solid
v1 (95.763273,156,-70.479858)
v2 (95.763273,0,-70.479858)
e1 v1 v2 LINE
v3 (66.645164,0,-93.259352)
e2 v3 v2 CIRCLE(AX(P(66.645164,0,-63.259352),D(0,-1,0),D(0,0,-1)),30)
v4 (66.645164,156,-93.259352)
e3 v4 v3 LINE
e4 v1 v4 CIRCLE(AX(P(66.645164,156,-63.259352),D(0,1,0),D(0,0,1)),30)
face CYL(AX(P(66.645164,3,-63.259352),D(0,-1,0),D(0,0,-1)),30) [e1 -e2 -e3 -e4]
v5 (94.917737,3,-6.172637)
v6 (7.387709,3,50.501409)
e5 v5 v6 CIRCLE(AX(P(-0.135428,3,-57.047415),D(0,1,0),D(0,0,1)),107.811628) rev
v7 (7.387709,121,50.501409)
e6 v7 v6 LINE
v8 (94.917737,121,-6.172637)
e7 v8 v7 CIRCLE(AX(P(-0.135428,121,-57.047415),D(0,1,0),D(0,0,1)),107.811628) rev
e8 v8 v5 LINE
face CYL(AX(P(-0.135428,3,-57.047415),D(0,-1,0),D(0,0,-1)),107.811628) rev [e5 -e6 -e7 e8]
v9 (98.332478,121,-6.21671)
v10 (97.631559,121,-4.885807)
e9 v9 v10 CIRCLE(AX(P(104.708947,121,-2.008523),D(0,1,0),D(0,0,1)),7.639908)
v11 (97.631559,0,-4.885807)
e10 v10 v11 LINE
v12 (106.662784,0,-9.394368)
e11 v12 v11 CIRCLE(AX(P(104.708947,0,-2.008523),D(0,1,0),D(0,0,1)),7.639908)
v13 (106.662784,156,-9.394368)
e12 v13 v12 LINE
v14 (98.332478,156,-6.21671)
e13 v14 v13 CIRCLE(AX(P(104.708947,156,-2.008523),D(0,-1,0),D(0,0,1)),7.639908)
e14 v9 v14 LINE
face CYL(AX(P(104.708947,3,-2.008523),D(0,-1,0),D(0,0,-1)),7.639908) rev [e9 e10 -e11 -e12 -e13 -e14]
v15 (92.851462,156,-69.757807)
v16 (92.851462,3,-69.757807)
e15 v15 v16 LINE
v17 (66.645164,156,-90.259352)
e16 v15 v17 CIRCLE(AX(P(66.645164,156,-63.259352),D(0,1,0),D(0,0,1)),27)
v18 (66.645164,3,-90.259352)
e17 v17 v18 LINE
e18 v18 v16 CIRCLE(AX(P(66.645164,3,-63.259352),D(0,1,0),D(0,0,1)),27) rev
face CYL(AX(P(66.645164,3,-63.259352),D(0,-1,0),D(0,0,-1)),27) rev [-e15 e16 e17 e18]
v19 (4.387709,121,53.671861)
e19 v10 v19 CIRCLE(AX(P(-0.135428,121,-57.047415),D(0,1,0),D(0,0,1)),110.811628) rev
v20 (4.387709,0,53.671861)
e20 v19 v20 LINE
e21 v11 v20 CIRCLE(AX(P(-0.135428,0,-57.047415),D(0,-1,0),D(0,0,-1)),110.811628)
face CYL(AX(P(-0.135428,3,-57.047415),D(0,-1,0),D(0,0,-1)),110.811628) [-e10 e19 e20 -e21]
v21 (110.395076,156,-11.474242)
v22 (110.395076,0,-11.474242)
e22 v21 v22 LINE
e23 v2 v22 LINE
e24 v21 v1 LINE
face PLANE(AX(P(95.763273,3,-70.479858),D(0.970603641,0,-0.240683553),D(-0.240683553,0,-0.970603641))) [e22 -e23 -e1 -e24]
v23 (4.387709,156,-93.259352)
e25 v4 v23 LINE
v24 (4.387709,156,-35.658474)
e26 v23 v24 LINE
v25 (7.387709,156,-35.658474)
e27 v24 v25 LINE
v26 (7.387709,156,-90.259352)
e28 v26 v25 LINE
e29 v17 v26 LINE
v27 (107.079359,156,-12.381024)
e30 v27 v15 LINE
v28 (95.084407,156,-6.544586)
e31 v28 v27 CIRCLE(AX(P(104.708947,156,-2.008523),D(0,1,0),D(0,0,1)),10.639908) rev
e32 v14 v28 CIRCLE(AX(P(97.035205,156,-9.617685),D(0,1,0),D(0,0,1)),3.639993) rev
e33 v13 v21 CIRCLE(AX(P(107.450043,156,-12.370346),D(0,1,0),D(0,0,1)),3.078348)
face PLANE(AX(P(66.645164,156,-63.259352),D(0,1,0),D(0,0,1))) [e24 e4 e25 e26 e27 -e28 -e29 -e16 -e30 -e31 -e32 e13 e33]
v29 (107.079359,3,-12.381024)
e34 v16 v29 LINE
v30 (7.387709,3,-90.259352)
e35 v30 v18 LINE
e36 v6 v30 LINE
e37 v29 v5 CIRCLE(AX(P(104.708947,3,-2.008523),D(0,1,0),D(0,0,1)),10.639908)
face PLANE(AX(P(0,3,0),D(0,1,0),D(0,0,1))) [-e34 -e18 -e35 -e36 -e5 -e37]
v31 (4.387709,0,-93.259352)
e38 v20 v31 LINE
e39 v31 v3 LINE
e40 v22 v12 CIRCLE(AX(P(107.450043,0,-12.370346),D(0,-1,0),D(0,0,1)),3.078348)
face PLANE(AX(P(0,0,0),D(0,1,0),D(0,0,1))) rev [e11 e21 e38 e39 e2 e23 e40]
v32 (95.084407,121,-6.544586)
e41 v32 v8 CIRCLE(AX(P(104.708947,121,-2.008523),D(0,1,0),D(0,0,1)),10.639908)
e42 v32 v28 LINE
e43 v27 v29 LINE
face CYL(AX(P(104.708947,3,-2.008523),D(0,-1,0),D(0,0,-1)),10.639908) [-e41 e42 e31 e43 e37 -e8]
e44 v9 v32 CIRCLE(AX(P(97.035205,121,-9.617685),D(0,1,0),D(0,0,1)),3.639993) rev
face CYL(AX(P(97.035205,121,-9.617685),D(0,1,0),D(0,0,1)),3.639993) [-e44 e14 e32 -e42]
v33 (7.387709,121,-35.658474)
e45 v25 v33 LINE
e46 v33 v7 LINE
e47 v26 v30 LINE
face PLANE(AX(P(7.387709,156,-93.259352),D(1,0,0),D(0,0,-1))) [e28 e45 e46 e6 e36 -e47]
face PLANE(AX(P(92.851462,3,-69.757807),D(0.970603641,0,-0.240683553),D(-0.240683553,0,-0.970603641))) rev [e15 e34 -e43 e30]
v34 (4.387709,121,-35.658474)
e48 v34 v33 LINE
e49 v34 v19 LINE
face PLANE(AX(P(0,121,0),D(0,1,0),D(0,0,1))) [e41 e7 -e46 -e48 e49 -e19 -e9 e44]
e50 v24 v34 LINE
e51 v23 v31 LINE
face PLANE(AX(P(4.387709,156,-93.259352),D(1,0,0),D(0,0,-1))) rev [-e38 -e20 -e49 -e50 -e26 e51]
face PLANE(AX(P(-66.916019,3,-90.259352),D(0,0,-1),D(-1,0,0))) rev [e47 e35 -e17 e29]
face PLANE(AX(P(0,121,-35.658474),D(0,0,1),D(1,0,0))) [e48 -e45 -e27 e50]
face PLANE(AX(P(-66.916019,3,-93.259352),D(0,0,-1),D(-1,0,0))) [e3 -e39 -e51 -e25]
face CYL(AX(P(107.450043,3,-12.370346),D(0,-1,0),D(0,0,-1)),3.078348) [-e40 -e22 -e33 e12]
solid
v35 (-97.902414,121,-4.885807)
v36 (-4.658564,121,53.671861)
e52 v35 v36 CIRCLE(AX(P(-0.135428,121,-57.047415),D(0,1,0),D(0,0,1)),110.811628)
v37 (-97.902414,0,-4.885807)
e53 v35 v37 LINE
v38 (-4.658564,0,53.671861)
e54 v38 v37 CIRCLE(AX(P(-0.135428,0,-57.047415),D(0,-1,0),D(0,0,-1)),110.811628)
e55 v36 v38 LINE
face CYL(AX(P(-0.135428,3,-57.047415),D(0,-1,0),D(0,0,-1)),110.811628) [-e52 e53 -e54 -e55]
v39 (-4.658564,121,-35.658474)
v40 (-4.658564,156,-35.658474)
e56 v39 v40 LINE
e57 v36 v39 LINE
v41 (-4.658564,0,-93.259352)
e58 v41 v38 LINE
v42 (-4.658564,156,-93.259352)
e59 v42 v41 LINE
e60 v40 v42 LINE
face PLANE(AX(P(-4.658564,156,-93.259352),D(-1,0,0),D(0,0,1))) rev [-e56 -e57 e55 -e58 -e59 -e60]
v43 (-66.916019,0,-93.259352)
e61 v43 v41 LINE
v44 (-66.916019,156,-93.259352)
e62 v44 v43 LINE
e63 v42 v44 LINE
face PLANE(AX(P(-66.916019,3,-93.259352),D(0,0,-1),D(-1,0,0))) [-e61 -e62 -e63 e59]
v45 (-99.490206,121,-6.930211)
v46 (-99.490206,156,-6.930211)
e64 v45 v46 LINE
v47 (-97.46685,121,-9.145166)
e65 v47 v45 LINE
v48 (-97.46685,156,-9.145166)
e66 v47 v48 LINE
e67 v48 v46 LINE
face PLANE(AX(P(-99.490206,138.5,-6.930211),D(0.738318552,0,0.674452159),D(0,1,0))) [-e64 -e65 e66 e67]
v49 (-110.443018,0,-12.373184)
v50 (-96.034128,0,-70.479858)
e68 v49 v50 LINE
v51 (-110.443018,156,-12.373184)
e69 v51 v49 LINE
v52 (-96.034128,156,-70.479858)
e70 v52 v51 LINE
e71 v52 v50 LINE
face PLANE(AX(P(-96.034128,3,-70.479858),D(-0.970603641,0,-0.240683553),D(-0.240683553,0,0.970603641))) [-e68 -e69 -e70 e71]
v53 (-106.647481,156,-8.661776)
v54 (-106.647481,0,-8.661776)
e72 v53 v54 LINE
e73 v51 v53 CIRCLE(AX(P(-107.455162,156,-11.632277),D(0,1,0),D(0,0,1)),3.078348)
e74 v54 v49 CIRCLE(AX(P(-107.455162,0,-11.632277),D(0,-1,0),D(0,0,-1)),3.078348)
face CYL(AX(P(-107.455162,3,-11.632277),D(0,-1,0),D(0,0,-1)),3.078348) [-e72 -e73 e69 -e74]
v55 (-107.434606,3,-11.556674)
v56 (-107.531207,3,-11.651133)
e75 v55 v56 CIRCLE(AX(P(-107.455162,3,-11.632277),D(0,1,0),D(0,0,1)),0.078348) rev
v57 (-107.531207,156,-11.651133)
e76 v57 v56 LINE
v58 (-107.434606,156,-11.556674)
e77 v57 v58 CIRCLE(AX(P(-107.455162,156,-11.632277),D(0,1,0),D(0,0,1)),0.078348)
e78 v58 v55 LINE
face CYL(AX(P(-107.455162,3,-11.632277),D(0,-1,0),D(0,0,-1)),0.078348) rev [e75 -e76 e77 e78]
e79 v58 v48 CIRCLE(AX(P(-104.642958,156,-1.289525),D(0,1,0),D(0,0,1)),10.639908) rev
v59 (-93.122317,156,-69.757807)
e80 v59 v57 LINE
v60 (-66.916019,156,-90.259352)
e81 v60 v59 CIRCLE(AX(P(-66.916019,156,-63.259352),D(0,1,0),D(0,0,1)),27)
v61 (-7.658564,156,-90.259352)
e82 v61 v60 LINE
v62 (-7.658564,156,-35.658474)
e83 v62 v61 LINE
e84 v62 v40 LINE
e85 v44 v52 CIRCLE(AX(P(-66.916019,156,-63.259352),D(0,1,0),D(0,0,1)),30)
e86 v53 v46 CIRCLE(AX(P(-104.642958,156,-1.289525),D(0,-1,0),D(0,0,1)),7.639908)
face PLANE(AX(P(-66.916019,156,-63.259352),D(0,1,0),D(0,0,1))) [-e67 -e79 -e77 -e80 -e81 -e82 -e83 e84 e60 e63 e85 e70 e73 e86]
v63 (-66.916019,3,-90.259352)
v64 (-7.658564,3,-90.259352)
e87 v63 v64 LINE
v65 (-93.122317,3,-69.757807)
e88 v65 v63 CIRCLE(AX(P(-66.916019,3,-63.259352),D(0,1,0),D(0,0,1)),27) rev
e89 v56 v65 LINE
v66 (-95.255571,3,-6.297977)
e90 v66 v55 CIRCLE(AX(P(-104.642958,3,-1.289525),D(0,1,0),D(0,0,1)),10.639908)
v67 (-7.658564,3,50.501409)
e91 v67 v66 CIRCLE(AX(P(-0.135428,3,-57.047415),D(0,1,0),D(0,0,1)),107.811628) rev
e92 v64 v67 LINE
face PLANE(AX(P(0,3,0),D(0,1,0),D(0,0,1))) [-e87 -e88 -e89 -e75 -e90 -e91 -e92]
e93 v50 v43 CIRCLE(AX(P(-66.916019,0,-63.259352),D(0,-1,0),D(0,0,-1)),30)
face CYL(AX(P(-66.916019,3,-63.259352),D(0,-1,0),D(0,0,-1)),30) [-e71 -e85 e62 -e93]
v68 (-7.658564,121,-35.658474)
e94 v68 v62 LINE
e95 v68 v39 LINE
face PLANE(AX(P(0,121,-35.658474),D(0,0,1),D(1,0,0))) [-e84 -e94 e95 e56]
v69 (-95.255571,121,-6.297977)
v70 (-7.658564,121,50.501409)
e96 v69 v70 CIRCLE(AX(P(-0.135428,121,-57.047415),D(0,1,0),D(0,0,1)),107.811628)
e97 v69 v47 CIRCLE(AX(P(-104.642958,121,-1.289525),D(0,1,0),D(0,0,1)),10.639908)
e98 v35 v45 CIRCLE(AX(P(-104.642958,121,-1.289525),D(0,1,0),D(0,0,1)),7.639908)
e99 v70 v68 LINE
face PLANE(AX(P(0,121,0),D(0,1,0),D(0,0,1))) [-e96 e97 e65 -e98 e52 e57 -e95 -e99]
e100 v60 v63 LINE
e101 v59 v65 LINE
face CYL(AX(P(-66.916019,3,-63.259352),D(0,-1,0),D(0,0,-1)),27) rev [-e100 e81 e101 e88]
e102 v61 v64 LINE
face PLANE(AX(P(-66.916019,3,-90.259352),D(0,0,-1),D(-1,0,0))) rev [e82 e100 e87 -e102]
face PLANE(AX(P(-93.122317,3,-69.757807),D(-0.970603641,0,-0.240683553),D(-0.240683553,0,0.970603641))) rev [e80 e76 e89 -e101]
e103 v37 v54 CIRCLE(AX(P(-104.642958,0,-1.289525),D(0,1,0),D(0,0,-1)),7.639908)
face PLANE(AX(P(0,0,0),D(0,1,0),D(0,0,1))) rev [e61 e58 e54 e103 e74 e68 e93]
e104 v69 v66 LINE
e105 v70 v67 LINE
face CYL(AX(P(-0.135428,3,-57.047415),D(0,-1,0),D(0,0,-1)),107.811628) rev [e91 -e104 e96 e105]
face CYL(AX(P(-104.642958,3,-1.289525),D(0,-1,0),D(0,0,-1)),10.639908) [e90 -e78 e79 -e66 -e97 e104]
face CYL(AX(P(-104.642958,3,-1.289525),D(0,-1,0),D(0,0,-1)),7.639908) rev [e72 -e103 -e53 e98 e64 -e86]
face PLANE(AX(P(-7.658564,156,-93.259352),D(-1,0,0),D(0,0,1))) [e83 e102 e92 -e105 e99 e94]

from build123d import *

# Parameters (mm, degrees)
SKETCH_1_W          = 300
SKETCH_1_H          = 250
EXTRUDE_1_DEPTH     = 3
SKETCH_2_W          = 300
SKETCH_2_H          = 250
CUT_EXTRUDE_1_DEPTH = 3
EXTRUDE_2_DEPTH     = 153
CUT_EXTRUDE_START   = -35
CUT_EXTRUDE_2_DEPTH = 35
CUT_EXTRUDE_START_2 = -10
CUT_EXTRUDE_3_DEPTH = 10
SHELL_START         = 3
SHELL_1_DEPTH       = 153
SHELL_START_2       = 121
SHELL_1_2_DEPTH     = 35
SHELL_2_T           = -3


# Read off the part's stored shape, not the designer's step: 抽壳1
with BuildPart() as part:
    # 草图1 → 凸台-拉伸1 (new body)
    with BuildSketch(Plane(origin=(0, 0, 0), x_dir=(1, 0, 0), z_dir=(0, 1, 0))):
        Rectangle(SKETCH_1_W, SKETCH_1_H)
    extrude(amount=EXTRUDE_1_DEPTH)

    # 草图2 → 切除-拉伸1 (cut)
    with BuildSketch(Plane.XZ):
        Rectangle(SKETCH_2_W, SKETCH_2_H)
        with BuildLine():
            Line((-96.034128138, -70.479858108), (-110.443017753, -12.373184121))
            ThreePointArc((-110.443017753, -12.373184121), (-109.607353553, -9.431300157), (-106.647480506, -8.661775979))
            ThreePointArc((-106.647480506, -8.661775979), (-101.61443354, -8.303527417), (-97.902413518, -4.885807248))
            ThreePointArc((-97.902413518, -4.885807248), (-0.135427504, 53.764212837), (97.631558511, -4.885807248))
            ThreePointArc((97.631558511, -4.885807248), (101.296546617, -8.843997431), (106.662783622, -9.394367981))
            ThreePointArc((106.662783622, -9.394367981), (108.948530847, -9.681339358), (110.395076199, -11.474241892))
            Line((110.395076199, -11.474241892), (95.763273131, -70.479858108))
            ThreePointArc((95.763273131, -70.479858108), (85.13008753, -86.887885102), (66.645163907, -93.259351533))
            Line((66.645163907, -93.259351533), (-66.916018914, -93.259351533))
            ThreePointArc((-66.916018914, -93.259351533), (-85.400942538, -86.887885102), (-96.034128138, -70.479858108))
        make_face(mode=Mode.SUBTRACT)
    extrude(amount=-CUT_EXTRUDE_1_DEPTH, mode=Mode.SUBTRACT)

    # 草图3 → 凸台-拉伸2 (add)
    with BuildSketch(Plane(origin=(0, 3, 0), x_dir=(1, 0, 0), z_dir=(0, 1, 0))):
        with BuildLine():
            Line((4.387708898, 93.259351533), (4.387708898, -53.671861104))
            ThreePointArc((4.387708898, -53.671861104), (58.797308872, -36.793671157), (97.631558511, 4.885807248))
            ThreePointArc((97.631558511, 4.885807248), (101.296546617, 8.843997431), (106.662783622, 9.394367981))
            ThreePointArc((106.662783622, 9.394367981), (108.948530847, 9.681339358), (110.395076199, 11.474241892))
            Line((110.395076199, 11.474241892), (95.763273131, 70.479858108))
            ThreePointArc((95.763273131, 70.479858108), (85.13008753, 86.887885102), (66.645163907, 93.259351533))
            Line((66.645163907, 93.259351533), (4.387708898, 93.259351533))
        make_face()
        with BuildLine():
            Line((-4.658563905, 93.259351533), (-4.658563905, -53.671861104))
            ThreePointArc((-4.658563905, -53.671861104), (-59.068163879, -36.793671157), (-97.902413518, 4.885807248))
            ThreePointArc((-97.902413518, 4.885807248), (-101.61443354, 8.303527417), (-106.647480506, 8.661775979))
            ThreePointArc((-106.647480506, 8.661775979), (-109.607353553, 9.431300157), (-110.443017753, 12.373184121))
            Line((-110.443017753, 12.373184121), (-96.034128138, 70.479858108))
            ThreePointArc((-96.034128138, 70.479858108), (-85.400942538, 86.887885102), (-66.916018914, 93.259351533))
            Line((-66.916018914, 93.259351533), (-4.658563905, 93.259351533))
        make_face()
    extrude(amount=EXTRUDE_2_DEPTH)

    # 草图4 → 切除-拉伸2 (cut)
    with BuildSketch(Plane(origin=(0, 156, 0), x_dir=(1, 0, 0), z_dir=(0, 1, 0)).offset(CUT_EXTRUDE_START)):
        with BuildLine():
            ThreePointArc((-90.555079263, 35.658474468), (-92.886476686, 22.794388775), (-93.396966674, 9.730717216))
            ThreePointArc((-93.396966674, 9.730717216), (-95.515099044, 6.310295135), (-99.490206151, 6.930210805))
            ThreePointArc((-99.490206151, 6.930210805), (-98.6090935, 5.975745875), (-97.902413518, 4.885807248))
            ThreePointArc((-97.902413518, 4.885807248), (-95.111575936, -0.038030653), (-92.072972831, -4.812949003))
            ThreePointArc((-92.072972831, -4.812949003), (-0.301965438, -80.948973345), (91.739456293, -5.140077521))
            Line((91.739456293, -5.140077521), (92.072972831, -4.812949003))
            ThreePointArc((92.072972831, -4.812949003), (94.500577424, -1.042475314), (96.773639732, 2.823132484))
            Line((96.773639732, 2.823132484), (98.387480713, 3.000917932))
            Line((98.387480713, 3.000917932), (98.675419823, 6.368186048))
            ThreePointArc((98.675419823, 6.368186048), (95.079526349, 6.547689669), (93.396966674, 9.730717216))
            ThreePointArc((93.39696666, 9.730717216), (92.888027795, 22.793796517), (90.563566393, 35.658474468))
            Line((90.563566393, 35.658474468), (-90.555079263, 35.658474468))
        make_face()
    extrude(amount=CUT_EXTRUDE_2_DEPTH, mode=Mode.SUBTRACT)

    # 草图5 → 切除-拉伸3 (cut)
    with BuildSketch(Plane(origin=(0, 3, 0), x_dir=(1, 0, 0), z_dir=(0, 1, 0)).offset(CUT_EXTRUDE_START_2)):
        with BuildLine():
            Line((4.387708898, 93.259351533), (-4.658563905, 93.259351533))
            Line((-4.658563905, 93.259351533), (-4.658563905, -53.671861104))
            ThreePointArc((-4.658563905, -53.671861104), (-0.135427504, -53.764212837), (4.387708898, -53.671861104))
            Line((4.387708898, -53.671861104), (4.387708898, 93.259351533))
        make_face()
    extrude(amount=CUT_EXTRUDE_3_DEPTH, mode=Mode.SUBTRACT)


with BuildPart() as cut_extrude_3_piece_1:
    # of the separate pieces the step leaves, piece 1, a body of its own (cut_extrude_3_pieces)
    add(part.part.solids().sort_by_distance((-4.658563905, 0, -93.259351533))[0])

    # 抽壳1 outline → 抽壳1 (cut)
    with BuildSketch(Plane(origin=(0, 0, 0), x_dir=(1, 0, 0), z_dir=(0, 1, 0)).offset(SHELL_START)):
        with BuildLine():
            ThreePointArc((-107.434605996, 11.556673813), (-100.425207833, 11.057750032), (-95.255570732, 6.29797695))
            ThreePointArc((-95.255570732, 6.29797695), (-58.790804671, -33.411934048), (-7.658563905, -50.501408869))
            Line((-7.658563905, -50.501408869), (-7.658563905, 90.259351533))
            Line((-7.658563905, 90.259351533), (-66.916018914, 90.259351533))
            ThreePointArc((-66.916018914, 90.259351533), (-83.552450175, 84.525031745), (-93.122317216, 69.75780745))
            Line((-93.122317216, 69.75780745), (-107.53120683, 11.651133463))
            ThreePointArc((-107.53120683, 11.651133463), (-107.509938205, 11.576259097), (-107.434605996, 11.556673813))
        make_face()
    extrude(amount=SHELL_1_DEPTH, mode=Mode.SUBTRACT)

    # Shell 1 2 outline → Shell 1 2 (cut)
    with BuildSketch(Plane(origin=(0, 0, 0), x_dir=(1, 0, 0), z_dir=(0, 1, 0)).offset(SHELL_START_2)):
        with BuildLine():
            Line((-97.466849673, 9.145166462), (-99.490206151, 6.930210805))
            ThreePointArc((-99.490206151, 6.930210805), (-97.485888684, 6.005700415), (-95.315849702, 6.409357179))
            ThreePointArc((-95.315849702, 6.409357179), (-96.278736414, 7.865802769), (-97.466849673, 9.145166462))
        make_face()
    extrude(amount=SHELL_1_2_DEPTH, mode=Mode.SUBTRACT)


with BuildPart() as cut_extrude_3_piece_2:
    # of the separate pieces the step leaves, piece 2, a body of its own (cut_extrude_3_pieces)
    add(part.part.solids().sort_by_distance((97.631558511, 0, -4.885807248))[0])

    # 抽壳2
    shell_2_openings = [cut_extrude_3_piece_2.faces().sort_by_distance(p)[0] for p in [
        (44.084656867, 121, 2.602080158),
        (94.9240226, 138.5, -6.652476848),
        (53.824283393, 156, -60.175200574),
        (92.888027795, 138.5, -22.793796517),
        (47.475637646, 138.5, -35.658474468),
    ]]
    offset(amount=SHELL_2_T, openings=shell_2_openings, kind=Kind.INTERSECTION)


solid = Compound([cut_extrude_3_piece_1.part, cut_extrude_3_piece_2.part])
